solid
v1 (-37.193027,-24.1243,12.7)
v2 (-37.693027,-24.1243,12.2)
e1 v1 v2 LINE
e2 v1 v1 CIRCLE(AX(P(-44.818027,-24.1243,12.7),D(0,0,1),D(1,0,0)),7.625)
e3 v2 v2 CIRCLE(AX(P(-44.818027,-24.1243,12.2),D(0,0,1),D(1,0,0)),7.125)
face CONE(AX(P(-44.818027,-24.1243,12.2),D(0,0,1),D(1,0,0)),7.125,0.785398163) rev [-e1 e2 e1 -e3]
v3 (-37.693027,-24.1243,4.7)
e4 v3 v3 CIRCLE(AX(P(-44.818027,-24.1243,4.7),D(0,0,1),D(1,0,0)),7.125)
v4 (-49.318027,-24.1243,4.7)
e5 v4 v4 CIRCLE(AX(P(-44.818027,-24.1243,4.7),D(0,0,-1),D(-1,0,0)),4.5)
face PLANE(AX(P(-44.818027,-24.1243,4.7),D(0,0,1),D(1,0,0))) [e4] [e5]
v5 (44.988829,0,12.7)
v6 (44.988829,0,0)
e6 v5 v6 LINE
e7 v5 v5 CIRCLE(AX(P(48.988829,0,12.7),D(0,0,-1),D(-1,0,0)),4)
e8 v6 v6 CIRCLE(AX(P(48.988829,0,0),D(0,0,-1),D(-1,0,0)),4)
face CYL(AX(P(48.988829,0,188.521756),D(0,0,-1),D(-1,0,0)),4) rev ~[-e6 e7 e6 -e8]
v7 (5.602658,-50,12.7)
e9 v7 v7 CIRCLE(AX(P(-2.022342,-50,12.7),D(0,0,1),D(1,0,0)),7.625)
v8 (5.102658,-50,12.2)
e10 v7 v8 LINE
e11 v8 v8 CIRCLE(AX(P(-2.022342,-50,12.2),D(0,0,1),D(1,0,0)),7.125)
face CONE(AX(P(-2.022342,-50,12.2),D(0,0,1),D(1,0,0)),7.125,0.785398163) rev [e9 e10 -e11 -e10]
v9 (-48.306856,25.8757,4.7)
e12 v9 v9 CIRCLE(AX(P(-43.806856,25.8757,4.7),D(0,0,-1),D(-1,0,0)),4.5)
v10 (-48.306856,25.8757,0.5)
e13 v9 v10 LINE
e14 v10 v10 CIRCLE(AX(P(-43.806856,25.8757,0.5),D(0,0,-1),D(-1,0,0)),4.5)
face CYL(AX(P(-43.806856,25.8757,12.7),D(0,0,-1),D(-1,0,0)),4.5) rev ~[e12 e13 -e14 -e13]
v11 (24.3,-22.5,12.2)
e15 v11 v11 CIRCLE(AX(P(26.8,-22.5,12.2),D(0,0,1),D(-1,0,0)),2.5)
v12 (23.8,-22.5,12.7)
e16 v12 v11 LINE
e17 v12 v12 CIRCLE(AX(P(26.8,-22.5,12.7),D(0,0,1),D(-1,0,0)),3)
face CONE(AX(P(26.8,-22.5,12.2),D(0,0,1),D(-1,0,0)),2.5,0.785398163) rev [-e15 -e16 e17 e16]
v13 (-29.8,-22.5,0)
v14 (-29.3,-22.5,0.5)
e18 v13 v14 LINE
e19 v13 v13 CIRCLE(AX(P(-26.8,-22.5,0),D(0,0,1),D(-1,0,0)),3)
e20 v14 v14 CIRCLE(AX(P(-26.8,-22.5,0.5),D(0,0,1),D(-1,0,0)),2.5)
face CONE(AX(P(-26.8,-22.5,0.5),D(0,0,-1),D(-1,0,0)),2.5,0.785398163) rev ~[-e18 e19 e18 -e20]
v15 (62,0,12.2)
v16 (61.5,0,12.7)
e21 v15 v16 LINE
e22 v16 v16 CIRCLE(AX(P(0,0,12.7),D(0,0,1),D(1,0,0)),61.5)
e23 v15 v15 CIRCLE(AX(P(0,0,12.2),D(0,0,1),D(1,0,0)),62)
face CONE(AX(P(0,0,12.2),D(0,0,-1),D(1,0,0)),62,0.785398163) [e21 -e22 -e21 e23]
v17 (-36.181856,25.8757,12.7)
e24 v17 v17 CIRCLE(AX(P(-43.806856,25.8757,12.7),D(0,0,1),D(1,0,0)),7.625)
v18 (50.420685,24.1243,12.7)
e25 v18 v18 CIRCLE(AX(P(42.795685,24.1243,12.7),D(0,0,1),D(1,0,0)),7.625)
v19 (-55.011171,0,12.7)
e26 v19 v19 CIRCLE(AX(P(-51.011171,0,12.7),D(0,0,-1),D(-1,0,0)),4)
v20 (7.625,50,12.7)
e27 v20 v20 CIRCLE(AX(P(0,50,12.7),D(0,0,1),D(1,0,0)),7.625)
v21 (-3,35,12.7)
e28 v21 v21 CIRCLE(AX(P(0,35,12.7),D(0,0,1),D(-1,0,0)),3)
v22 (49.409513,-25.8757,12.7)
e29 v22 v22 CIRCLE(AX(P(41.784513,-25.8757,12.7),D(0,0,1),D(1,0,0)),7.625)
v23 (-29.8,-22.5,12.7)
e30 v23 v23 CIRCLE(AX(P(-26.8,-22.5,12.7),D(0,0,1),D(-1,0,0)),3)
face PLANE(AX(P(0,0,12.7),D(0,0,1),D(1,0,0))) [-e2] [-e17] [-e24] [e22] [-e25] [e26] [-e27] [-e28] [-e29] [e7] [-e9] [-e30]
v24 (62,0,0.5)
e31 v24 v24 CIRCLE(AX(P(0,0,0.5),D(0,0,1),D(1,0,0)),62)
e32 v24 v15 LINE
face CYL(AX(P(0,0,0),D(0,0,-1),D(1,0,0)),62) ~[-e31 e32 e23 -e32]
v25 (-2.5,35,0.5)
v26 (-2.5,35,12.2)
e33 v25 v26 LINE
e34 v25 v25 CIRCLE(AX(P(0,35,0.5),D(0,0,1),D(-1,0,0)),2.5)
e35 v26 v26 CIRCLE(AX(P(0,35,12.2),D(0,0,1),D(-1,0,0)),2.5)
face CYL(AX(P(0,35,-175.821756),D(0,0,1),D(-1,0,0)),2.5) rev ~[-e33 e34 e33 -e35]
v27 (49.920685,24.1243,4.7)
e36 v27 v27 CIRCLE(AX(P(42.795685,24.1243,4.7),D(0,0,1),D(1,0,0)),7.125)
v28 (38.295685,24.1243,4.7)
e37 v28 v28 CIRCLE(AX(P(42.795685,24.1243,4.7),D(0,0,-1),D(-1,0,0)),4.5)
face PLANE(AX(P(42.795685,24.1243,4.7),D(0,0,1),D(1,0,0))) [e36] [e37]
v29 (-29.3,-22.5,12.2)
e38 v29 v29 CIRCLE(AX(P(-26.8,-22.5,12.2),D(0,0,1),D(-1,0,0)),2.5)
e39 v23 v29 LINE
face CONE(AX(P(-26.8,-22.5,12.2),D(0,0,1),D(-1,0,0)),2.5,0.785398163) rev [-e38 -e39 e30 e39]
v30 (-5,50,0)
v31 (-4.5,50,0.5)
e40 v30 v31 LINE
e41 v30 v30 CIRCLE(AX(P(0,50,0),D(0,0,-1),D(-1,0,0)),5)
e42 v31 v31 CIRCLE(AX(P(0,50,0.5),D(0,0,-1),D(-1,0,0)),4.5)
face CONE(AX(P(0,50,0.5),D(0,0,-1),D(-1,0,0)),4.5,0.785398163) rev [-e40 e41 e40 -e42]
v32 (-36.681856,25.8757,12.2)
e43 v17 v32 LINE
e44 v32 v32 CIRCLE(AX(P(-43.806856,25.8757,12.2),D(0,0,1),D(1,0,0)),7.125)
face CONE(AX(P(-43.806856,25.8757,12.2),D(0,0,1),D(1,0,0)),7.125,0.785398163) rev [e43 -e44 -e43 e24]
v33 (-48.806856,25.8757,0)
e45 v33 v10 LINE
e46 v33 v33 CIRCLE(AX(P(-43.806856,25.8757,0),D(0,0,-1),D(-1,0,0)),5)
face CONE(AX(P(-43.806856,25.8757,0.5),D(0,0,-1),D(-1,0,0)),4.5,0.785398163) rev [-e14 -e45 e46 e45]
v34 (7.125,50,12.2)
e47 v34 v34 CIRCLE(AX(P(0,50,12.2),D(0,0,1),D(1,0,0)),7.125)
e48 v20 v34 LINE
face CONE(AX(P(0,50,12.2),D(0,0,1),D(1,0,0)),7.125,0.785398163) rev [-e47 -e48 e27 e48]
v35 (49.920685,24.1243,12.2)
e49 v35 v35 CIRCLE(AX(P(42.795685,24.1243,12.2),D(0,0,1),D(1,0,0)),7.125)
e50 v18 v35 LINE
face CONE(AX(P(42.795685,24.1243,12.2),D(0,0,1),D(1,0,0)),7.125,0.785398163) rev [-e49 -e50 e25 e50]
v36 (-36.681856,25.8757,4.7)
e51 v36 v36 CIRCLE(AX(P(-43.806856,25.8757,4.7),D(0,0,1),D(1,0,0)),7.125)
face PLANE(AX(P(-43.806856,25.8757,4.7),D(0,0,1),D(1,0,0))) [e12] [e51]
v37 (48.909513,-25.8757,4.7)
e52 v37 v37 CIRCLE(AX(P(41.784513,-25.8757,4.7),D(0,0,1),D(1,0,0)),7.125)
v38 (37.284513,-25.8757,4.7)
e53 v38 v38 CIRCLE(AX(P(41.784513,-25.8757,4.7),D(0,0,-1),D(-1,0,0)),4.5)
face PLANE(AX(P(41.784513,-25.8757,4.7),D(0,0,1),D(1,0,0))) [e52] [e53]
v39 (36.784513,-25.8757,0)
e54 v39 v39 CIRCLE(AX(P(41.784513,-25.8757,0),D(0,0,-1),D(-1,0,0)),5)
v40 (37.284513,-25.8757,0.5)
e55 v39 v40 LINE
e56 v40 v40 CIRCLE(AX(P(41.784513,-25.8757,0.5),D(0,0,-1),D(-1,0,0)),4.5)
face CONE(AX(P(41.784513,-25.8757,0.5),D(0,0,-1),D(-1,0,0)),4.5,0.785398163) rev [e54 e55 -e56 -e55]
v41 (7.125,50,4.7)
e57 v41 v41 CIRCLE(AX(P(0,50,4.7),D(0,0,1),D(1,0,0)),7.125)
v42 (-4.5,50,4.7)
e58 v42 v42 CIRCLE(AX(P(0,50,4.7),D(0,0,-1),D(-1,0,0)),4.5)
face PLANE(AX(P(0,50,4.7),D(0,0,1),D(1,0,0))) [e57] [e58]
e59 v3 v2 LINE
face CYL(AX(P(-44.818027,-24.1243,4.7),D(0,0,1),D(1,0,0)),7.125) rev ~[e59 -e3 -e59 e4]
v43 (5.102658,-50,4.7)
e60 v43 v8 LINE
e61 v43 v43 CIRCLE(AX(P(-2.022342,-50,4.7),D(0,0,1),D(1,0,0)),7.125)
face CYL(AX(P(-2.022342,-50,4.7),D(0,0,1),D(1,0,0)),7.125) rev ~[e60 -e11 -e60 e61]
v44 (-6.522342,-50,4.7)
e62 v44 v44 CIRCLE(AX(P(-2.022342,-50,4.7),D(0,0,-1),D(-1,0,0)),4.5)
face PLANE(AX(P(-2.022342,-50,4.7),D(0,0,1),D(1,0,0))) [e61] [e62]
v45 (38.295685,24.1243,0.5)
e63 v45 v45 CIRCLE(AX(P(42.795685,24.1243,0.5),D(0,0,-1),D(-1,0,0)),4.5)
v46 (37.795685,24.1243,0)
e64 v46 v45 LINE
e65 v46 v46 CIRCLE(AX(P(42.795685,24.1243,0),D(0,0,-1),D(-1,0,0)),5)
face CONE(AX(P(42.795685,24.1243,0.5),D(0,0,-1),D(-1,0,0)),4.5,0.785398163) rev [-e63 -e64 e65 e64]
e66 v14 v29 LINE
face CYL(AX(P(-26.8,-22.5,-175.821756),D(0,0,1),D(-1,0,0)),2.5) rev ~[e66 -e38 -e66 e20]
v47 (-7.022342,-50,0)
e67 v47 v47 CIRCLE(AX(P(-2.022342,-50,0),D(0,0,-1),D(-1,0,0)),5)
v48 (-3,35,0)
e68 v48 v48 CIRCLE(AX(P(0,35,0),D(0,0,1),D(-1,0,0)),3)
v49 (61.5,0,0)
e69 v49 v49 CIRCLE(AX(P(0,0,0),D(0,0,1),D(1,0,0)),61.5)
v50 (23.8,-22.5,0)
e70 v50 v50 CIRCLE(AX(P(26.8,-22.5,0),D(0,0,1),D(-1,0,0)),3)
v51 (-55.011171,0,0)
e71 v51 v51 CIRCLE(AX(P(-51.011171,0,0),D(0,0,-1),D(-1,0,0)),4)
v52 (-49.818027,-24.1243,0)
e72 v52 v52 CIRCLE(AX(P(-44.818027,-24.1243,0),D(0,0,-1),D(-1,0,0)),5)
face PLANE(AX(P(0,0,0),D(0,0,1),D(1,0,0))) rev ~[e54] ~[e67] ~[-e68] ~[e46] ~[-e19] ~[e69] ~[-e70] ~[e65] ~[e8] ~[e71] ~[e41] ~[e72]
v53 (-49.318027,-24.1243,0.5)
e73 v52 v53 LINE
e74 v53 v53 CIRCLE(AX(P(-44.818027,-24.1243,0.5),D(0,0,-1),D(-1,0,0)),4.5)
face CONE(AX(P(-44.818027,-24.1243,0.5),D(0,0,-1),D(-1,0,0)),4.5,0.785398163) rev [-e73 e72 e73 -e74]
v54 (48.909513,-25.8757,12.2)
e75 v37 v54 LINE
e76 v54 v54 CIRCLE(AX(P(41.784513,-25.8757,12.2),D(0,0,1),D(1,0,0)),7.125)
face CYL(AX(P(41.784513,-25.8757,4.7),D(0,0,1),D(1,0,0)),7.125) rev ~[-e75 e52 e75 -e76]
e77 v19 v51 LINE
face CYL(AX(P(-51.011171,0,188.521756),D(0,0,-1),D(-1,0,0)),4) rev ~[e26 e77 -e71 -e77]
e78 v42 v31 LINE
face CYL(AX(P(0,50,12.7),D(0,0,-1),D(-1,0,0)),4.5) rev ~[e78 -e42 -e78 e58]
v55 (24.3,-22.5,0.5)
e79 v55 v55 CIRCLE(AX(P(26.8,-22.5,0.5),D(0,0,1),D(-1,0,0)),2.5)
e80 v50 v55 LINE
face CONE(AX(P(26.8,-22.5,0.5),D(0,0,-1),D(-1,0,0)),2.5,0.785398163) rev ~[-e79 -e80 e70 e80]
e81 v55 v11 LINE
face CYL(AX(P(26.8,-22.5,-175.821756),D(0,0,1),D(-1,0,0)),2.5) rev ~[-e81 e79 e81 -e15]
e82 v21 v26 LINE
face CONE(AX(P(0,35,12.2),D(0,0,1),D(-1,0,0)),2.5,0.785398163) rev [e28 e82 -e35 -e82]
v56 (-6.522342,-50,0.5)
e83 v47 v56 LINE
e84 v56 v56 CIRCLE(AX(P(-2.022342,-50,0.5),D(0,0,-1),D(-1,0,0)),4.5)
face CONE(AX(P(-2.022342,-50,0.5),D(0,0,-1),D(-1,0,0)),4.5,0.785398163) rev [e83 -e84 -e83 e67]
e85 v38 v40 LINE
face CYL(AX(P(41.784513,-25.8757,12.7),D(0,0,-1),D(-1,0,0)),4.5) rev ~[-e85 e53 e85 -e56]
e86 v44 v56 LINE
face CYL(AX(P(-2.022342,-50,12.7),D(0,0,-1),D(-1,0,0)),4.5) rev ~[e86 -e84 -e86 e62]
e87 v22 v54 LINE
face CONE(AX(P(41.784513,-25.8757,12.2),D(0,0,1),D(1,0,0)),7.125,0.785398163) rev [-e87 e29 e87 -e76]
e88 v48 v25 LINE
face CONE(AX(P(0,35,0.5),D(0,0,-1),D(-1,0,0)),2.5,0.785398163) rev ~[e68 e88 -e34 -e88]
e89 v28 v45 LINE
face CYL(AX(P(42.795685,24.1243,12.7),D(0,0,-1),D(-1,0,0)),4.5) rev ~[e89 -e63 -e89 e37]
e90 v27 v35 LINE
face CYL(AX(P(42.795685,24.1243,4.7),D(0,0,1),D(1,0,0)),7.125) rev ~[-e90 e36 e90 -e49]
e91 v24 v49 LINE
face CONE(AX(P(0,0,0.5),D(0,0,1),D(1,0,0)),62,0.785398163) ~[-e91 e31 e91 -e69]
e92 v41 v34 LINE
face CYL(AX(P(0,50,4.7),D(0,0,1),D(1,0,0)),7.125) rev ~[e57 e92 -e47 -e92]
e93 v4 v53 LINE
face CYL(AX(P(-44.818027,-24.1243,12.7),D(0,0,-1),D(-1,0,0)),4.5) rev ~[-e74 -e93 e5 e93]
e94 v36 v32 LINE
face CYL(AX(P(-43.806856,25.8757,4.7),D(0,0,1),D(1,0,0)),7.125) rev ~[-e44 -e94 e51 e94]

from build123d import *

# Parameters (mm, degrees)
F0_R           = 62
F1_DEPTH       = 12.7
F2_D           = 5
F4_D           = 9
F4_CBORE_D     = 14.25
F4_CBORE_DEPTH = 8
F5_SIZE        = 0.5
F6_D           = 8


# Not quite as in the source:
# - a feature names something its author has since deleted; it is built from what else it names


with BuildPart() as f1:
    # F0 (on Top) → F1 (new body)
    with BuildSketch(Plane.XY):
        Circle(F0_R)
    extrude(amount=F1_DEPTH)

    # F2 (through all)
    with Locations(Plane(origin=(0, 0, 0), x_dir=(1, 0, 0), z_dir=(0, 0, -1))):
        with Locations((0, -35), (26.8, 22.5), (-26.8, 22.5)):
            Hole(F2_D / 2)

    # F4 (through all)
    with Locations(Plane.XY.offset(12.7)):
        with Locations((0, 50), (-43.8068557852, 25.8756999398), (42.7956845933, 24.1243000602), (-44.8180269771, -24.1243000602), (-2.0223423839, -50), (41.7845134013, -25.8756999398)):
            CounterBoreHole(F4_D / 2, F4_CBORE_D / 2, F4_CBORE_DEPTH)

    # F5
    f5_edges = [f1.edges().sort_by_distance(p)[0] for p in [
        (-62, 0, 12.7),
        (-9.147342, -50, 12.7),
        (-51.943027, -24.1243, 12.7),
        (-29.3, -22.5, 12.7),
        (24.3, -22.5, 12.7),
        (34.659513, -25.8757, 12.7),
        (-50.931856, 25.8757, 12.7),
        (35.670685, 24.1243, 12.7),
        (-2.5, 35, 12.7),
        (-7.125, 50, 12.7),
        (-62, 0, 0),
        (-6.522342, -50, 0),
        (-49.318027, -24.1243, 0),
        (-29.3, -22.5, 0),
        (24.3, -22.5, 0),
        (37.284513, -25.8757, 0),
        (-48.306856, 25.8757, 0),
        (38.295685, 24.1243, 0),
        (-2.5, 35, 0),
        (-4.5, 50, 0),
    ]]
    chamfer(f5_edges, length=F5_SIZE)

    # F6 (through all)
    with Locations(Plane.XY.offset(12.7)):
        with Locations((-51.0111711919, 0), (48.9888288081, 0)):
            Hole(F6_D / 2)


solid = f1.part
